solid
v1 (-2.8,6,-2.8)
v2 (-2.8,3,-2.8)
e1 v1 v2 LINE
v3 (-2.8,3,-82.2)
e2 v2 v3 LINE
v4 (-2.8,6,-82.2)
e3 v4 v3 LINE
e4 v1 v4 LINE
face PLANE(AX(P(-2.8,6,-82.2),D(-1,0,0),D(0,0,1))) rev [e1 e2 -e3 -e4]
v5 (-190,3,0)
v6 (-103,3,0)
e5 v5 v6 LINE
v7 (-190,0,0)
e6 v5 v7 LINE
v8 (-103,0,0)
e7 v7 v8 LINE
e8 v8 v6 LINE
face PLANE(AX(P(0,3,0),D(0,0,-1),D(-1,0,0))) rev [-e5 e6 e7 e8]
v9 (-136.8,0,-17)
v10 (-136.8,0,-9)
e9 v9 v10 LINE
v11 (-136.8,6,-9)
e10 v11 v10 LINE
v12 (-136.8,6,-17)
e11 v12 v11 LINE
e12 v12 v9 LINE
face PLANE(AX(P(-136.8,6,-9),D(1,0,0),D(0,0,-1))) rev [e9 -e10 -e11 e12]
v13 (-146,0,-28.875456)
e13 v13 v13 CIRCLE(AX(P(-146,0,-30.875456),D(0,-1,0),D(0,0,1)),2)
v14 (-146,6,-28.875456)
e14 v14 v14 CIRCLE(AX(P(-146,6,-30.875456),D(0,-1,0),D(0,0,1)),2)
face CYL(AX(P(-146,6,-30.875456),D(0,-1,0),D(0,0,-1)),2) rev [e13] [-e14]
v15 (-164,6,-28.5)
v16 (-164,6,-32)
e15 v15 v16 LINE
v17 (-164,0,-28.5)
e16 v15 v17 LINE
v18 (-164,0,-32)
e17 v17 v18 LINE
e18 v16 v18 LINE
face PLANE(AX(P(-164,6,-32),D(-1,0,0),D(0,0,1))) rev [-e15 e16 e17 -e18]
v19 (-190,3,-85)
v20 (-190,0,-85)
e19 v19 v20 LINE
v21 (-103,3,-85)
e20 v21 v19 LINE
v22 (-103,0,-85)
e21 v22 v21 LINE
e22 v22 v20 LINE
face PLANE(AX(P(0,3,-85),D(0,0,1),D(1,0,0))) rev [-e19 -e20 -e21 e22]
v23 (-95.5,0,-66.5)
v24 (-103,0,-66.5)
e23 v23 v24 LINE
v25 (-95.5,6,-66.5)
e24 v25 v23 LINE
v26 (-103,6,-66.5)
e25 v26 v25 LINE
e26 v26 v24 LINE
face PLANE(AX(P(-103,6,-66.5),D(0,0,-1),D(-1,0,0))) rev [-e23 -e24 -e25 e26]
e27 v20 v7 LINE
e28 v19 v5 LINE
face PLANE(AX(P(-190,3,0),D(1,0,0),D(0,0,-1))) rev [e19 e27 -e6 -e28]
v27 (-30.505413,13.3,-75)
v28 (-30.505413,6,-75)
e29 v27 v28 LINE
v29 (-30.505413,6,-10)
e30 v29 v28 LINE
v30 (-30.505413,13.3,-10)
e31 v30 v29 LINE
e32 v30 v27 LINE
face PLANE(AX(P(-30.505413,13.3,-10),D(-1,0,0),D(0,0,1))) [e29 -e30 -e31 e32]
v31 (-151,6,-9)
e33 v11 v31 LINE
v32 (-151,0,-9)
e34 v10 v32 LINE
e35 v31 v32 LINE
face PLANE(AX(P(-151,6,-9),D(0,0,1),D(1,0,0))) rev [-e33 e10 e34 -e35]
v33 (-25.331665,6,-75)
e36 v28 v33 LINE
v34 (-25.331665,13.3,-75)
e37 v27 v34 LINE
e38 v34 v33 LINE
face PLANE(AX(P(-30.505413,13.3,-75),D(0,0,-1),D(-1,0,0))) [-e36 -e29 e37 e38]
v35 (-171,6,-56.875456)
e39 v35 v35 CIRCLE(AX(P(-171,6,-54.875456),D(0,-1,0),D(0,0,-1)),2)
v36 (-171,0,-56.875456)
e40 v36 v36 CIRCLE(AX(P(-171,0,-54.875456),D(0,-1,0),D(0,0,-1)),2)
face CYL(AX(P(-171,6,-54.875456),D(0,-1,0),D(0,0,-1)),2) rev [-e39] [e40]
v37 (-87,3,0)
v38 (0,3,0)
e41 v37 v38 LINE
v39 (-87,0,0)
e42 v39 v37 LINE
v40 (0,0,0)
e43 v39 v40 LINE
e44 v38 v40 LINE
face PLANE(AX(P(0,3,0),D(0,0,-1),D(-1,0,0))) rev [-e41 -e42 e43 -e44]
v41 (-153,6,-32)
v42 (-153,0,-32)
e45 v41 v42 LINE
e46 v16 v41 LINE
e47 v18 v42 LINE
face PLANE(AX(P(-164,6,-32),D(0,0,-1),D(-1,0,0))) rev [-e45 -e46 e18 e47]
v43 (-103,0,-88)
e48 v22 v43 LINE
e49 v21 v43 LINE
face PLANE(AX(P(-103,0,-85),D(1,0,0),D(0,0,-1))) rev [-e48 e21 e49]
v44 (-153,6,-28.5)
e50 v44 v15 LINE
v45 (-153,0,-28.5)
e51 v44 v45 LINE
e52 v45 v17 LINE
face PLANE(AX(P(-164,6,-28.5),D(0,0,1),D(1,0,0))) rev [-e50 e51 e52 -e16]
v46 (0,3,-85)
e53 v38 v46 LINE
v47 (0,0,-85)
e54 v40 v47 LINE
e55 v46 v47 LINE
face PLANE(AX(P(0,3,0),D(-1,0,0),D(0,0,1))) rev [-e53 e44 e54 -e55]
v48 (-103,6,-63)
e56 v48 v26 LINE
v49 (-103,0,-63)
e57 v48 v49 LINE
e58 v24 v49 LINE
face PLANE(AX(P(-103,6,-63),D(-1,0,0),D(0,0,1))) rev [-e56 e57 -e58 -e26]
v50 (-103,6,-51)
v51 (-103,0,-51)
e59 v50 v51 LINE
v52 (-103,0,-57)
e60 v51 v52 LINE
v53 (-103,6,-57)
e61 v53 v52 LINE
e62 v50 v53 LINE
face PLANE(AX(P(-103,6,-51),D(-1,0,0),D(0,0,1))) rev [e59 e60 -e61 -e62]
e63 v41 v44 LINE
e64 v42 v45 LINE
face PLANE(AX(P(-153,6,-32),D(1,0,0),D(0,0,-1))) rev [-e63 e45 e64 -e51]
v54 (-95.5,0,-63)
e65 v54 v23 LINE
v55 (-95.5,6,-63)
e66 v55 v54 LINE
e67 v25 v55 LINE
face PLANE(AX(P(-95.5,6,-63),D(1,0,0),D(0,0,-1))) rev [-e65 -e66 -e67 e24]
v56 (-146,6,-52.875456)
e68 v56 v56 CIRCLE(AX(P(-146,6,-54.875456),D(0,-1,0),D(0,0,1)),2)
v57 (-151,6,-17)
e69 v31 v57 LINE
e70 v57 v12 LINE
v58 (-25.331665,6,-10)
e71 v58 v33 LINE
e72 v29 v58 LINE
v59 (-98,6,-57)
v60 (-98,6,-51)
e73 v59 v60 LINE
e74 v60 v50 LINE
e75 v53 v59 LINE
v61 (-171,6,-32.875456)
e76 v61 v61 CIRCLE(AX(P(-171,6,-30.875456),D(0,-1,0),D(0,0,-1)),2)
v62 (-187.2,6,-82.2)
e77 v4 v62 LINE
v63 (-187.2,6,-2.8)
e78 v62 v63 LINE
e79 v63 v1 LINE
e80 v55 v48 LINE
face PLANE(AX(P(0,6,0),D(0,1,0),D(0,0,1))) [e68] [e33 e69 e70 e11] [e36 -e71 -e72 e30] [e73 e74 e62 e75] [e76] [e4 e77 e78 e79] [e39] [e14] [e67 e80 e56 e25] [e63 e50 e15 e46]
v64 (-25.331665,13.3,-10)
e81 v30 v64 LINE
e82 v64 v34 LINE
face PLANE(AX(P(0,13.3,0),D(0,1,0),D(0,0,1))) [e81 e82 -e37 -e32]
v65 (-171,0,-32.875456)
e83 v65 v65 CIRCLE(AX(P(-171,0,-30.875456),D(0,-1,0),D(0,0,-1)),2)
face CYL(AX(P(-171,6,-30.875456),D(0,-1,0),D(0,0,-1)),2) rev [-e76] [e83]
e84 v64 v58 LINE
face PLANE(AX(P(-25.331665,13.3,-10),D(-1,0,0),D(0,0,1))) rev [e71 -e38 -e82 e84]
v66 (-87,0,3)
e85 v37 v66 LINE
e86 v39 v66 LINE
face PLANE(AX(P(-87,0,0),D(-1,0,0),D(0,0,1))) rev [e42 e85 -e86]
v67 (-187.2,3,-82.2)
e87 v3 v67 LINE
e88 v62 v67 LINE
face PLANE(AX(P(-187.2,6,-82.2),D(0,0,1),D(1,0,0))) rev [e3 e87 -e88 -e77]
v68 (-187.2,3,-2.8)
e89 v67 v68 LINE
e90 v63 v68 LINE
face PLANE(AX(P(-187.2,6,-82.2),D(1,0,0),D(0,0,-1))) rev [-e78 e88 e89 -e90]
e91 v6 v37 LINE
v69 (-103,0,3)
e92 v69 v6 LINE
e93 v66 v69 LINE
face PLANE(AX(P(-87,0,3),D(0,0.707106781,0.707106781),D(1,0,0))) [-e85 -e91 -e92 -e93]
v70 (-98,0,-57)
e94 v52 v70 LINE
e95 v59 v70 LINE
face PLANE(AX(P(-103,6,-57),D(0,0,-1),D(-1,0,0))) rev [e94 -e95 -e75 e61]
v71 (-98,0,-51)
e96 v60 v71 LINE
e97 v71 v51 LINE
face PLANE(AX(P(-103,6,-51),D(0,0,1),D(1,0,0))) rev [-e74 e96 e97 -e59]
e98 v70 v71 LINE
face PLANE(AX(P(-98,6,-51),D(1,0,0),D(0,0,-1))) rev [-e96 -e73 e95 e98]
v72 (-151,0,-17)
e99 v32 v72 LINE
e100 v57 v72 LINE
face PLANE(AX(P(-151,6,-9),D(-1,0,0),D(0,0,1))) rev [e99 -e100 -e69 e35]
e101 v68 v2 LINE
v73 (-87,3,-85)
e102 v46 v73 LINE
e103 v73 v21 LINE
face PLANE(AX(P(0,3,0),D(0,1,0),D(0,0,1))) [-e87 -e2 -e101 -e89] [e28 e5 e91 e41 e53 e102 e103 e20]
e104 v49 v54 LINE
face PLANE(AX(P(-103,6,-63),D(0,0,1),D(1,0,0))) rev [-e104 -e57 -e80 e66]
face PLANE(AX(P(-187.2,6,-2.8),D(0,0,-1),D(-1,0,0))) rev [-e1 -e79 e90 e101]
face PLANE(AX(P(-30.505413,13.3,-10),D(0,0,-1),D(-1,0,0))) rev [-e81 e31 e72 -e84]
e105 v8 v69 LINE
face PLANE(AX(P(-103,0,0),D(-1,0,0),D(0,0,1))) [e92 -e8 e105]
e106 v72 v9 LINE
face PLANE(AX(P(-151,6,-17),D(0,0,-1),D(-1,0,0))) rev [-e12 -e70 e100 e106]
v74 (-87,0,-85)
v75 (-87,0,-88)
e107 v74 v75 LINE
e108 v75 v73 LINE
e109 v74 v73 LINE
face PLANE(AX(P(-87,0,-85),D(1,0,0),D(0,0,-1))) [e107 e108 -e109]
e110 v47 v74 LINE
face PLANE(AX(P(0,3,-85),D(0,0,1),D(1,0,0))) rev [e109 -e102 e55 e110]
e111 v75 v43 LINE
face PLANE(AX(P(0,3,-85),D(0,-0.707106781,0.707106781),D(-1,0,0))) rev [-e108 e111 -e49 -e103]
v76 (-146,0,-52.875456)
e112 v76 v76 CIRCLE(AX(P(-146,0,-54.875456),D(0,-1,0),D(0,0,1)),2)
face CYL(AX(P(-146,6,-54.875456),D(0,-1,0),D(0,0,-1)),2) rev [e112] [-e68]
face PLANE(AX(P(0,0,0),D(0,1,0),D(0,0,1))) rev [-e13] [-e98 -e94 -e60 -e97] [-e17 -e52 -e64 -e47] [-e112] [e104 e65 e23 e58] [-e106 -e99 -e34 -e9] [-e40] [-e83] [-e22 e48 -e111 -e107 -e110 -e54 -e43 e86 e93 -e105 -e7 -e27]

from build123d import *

# Parameters (mm, degrees)
SKETCH2_W               = 190
SKETCH2_H               = 85
BOSS_EXTRUDE1_DEPTH     = 3
SKETCH6_W               = 184.4
SKETCH6_H               = 79.4
BOSS_EXTRUDE4_DEPTH     = 3
SKETCH8_W               = 16
SKETCH8_H               = 3
BOSS_EXTRUDE5_DEPTH     = 3
CHAMFER2_SIZE           = 3
CUT_EXTRUDE1_DEPTH      = 210.475535564
CUT_EXTRUDE1_DEPTH_BACK = 210.475535564
SKETCH10_W              = 7.5
SKETCH10_H              = 3.5
SKETCH11_W              = 5
SKETCH11_H              = 6
CUT_EXTRUDE2_DEPTH      = 210.475535564
SKETCH12_R              = 2
SKETCH12_W              = 11
SKETCH12_H              = 3.5
CUT_EXTRUDE3_DEPTH      = 210.475535564
SKETCH13_W              = 14.2
SKETCH13_H              = 8
CUT_EXTRUDE4_DEPTH      = 210.475535564
SKETCH14_W              = 5.173747918
SKETCH14_H              = 65
BOSS_EXTRUDE6_DEPTH     = 7.3


with BuildPart() as part:
    # Sketch2 → Boss-Extrude1 (new body)
    with BuildSketch(Plane(origin=(0, 0, 0), x_dir=(1, 0, 0), z_dir=(0, 1, 0))):
        with Locations((-95, 42.5)):
            Rectangle(SKETCH2_W, SKETCH2_H)
    extrude(amount=BOSS_EXTRUDE1_DEPTH)

    # Sketch6 → Boss-Extrude4 (add)
    with BuildSketch(Plane(origin=(0, 3, 0), x_dir=(1, 0, 0), z_dir=(0, 1, 0))):
        with Locations((-95, 42.5)):
            Rectangle(SKETCH6_W, SKETCH6_H)
    extrude(amount=BOSS_EXTRUDE4_DEPTH)

    # Sketch8 → Boss-Extrude5 (add)
    with BuildSketch(Plane(origin=(0, 3, 0), x_dir=(1, 0, 0), z_dir=(0, 1, 0))):
        with Locations((-95, -1.5)):
            Rectangle(SKETCH8_W, SKETCH8_H)
        with Locations((-95, 86.5)):
            Rectangle(SKETCH8_W, SKETCH8_H)
    extrude(amount=-BOSS_EXTRUDE5_DEPTH)

    # Chamfer2
    chamfer2_edges = [part.edges().sort_by_distance(p)[0] for p in [
        (-95, 3, 3),
        (-95, 3, -88),
    ]]
    chamfer(chamfer2_edges, length=CHAMFER2_SIZE - 0.0001)  # a hair under: the kernel refuses the full size

    # Sketch10 → Cut-Extrude1 (cut, two sides: drawn at the far end of the back side and taken through both)
    with BuildSketch(Plane.XZ.offset(-CUT_EXTRUDE1_DEPTH_BACK)):
        with Locations((-99.25, -64.75)):
            Rectangle(SKETCH10_W, SKETCH10_H)
    extrude(amount=CUT_EXTRUDE1_DEPTH + CUT_EXTRUDE1_DEPTH_BACK, mode=Mode.SUBTRACT)

    # Sketch11 → Cut-Extrude2 (cut, through all)
    with BuildSketch(Plane.XZ):
        with Locations((-100.5, -54)):
            Rectangle(SKETCH11_W, SKETCH11_H)
    extrude(amount=-CUT_EXTRUDE2_DEPTH, mode=Mode.SUBTRACT)

    # Sketch12 → Cut-Extrude3 (cut, through all)
    with BuildSketch(Plane.XZ):
        with Locations(Location((-171, -54.875455527, 0), (0, 0, 270))):
            Circle(SKETCH12_R)
        with Locations(Location((-171, -30.875455527, 0), (0, 0, 270))):
            Circle(SKETCH12_R)
        with Locations(Location((-146, -54.875455527, 0), (0, 0, 90))):
            Circle(SKETCH12_R)
        with Locations(Location((-146, -30.875455527, 0), (0, 0, 90))):
            Circle(SKETCH12_R)
        with Locations((-158.5, -30.25)):
            Rectangle(SKETCH12_W, SKETCH12_H)
    extrude(amount=-CUT_EXTRUDE3_DEPTH, mode=Mode.SUBTRACT)

    # Sketch13 → Cut-Extrude4 (cut, through all)
    with BuildSketch(Plane.XZ):
        with Locations((-143.9, -13)):
            Rectangle(SKETCH13_W, SKETCH13_H)
    extrude(amount=-CUT_EXTRUDE4_DEPTH, mode=Mode.SUBTRACT)

    # Sketch14 → Boss-Extrude6 (add)
    with BuildSketch(Plane(origin=(0, 6, 0), x_dir=(1, 0, 0), z_dir=(0, 1, 0))):
        with Locations((-27.918538548, 42.5)):
            Rectangle(SKETCH14_W, SKETCH14_H)
    extrude(amount=BOSS_EXTRUDE6_DEPTH)


solid = part.part
